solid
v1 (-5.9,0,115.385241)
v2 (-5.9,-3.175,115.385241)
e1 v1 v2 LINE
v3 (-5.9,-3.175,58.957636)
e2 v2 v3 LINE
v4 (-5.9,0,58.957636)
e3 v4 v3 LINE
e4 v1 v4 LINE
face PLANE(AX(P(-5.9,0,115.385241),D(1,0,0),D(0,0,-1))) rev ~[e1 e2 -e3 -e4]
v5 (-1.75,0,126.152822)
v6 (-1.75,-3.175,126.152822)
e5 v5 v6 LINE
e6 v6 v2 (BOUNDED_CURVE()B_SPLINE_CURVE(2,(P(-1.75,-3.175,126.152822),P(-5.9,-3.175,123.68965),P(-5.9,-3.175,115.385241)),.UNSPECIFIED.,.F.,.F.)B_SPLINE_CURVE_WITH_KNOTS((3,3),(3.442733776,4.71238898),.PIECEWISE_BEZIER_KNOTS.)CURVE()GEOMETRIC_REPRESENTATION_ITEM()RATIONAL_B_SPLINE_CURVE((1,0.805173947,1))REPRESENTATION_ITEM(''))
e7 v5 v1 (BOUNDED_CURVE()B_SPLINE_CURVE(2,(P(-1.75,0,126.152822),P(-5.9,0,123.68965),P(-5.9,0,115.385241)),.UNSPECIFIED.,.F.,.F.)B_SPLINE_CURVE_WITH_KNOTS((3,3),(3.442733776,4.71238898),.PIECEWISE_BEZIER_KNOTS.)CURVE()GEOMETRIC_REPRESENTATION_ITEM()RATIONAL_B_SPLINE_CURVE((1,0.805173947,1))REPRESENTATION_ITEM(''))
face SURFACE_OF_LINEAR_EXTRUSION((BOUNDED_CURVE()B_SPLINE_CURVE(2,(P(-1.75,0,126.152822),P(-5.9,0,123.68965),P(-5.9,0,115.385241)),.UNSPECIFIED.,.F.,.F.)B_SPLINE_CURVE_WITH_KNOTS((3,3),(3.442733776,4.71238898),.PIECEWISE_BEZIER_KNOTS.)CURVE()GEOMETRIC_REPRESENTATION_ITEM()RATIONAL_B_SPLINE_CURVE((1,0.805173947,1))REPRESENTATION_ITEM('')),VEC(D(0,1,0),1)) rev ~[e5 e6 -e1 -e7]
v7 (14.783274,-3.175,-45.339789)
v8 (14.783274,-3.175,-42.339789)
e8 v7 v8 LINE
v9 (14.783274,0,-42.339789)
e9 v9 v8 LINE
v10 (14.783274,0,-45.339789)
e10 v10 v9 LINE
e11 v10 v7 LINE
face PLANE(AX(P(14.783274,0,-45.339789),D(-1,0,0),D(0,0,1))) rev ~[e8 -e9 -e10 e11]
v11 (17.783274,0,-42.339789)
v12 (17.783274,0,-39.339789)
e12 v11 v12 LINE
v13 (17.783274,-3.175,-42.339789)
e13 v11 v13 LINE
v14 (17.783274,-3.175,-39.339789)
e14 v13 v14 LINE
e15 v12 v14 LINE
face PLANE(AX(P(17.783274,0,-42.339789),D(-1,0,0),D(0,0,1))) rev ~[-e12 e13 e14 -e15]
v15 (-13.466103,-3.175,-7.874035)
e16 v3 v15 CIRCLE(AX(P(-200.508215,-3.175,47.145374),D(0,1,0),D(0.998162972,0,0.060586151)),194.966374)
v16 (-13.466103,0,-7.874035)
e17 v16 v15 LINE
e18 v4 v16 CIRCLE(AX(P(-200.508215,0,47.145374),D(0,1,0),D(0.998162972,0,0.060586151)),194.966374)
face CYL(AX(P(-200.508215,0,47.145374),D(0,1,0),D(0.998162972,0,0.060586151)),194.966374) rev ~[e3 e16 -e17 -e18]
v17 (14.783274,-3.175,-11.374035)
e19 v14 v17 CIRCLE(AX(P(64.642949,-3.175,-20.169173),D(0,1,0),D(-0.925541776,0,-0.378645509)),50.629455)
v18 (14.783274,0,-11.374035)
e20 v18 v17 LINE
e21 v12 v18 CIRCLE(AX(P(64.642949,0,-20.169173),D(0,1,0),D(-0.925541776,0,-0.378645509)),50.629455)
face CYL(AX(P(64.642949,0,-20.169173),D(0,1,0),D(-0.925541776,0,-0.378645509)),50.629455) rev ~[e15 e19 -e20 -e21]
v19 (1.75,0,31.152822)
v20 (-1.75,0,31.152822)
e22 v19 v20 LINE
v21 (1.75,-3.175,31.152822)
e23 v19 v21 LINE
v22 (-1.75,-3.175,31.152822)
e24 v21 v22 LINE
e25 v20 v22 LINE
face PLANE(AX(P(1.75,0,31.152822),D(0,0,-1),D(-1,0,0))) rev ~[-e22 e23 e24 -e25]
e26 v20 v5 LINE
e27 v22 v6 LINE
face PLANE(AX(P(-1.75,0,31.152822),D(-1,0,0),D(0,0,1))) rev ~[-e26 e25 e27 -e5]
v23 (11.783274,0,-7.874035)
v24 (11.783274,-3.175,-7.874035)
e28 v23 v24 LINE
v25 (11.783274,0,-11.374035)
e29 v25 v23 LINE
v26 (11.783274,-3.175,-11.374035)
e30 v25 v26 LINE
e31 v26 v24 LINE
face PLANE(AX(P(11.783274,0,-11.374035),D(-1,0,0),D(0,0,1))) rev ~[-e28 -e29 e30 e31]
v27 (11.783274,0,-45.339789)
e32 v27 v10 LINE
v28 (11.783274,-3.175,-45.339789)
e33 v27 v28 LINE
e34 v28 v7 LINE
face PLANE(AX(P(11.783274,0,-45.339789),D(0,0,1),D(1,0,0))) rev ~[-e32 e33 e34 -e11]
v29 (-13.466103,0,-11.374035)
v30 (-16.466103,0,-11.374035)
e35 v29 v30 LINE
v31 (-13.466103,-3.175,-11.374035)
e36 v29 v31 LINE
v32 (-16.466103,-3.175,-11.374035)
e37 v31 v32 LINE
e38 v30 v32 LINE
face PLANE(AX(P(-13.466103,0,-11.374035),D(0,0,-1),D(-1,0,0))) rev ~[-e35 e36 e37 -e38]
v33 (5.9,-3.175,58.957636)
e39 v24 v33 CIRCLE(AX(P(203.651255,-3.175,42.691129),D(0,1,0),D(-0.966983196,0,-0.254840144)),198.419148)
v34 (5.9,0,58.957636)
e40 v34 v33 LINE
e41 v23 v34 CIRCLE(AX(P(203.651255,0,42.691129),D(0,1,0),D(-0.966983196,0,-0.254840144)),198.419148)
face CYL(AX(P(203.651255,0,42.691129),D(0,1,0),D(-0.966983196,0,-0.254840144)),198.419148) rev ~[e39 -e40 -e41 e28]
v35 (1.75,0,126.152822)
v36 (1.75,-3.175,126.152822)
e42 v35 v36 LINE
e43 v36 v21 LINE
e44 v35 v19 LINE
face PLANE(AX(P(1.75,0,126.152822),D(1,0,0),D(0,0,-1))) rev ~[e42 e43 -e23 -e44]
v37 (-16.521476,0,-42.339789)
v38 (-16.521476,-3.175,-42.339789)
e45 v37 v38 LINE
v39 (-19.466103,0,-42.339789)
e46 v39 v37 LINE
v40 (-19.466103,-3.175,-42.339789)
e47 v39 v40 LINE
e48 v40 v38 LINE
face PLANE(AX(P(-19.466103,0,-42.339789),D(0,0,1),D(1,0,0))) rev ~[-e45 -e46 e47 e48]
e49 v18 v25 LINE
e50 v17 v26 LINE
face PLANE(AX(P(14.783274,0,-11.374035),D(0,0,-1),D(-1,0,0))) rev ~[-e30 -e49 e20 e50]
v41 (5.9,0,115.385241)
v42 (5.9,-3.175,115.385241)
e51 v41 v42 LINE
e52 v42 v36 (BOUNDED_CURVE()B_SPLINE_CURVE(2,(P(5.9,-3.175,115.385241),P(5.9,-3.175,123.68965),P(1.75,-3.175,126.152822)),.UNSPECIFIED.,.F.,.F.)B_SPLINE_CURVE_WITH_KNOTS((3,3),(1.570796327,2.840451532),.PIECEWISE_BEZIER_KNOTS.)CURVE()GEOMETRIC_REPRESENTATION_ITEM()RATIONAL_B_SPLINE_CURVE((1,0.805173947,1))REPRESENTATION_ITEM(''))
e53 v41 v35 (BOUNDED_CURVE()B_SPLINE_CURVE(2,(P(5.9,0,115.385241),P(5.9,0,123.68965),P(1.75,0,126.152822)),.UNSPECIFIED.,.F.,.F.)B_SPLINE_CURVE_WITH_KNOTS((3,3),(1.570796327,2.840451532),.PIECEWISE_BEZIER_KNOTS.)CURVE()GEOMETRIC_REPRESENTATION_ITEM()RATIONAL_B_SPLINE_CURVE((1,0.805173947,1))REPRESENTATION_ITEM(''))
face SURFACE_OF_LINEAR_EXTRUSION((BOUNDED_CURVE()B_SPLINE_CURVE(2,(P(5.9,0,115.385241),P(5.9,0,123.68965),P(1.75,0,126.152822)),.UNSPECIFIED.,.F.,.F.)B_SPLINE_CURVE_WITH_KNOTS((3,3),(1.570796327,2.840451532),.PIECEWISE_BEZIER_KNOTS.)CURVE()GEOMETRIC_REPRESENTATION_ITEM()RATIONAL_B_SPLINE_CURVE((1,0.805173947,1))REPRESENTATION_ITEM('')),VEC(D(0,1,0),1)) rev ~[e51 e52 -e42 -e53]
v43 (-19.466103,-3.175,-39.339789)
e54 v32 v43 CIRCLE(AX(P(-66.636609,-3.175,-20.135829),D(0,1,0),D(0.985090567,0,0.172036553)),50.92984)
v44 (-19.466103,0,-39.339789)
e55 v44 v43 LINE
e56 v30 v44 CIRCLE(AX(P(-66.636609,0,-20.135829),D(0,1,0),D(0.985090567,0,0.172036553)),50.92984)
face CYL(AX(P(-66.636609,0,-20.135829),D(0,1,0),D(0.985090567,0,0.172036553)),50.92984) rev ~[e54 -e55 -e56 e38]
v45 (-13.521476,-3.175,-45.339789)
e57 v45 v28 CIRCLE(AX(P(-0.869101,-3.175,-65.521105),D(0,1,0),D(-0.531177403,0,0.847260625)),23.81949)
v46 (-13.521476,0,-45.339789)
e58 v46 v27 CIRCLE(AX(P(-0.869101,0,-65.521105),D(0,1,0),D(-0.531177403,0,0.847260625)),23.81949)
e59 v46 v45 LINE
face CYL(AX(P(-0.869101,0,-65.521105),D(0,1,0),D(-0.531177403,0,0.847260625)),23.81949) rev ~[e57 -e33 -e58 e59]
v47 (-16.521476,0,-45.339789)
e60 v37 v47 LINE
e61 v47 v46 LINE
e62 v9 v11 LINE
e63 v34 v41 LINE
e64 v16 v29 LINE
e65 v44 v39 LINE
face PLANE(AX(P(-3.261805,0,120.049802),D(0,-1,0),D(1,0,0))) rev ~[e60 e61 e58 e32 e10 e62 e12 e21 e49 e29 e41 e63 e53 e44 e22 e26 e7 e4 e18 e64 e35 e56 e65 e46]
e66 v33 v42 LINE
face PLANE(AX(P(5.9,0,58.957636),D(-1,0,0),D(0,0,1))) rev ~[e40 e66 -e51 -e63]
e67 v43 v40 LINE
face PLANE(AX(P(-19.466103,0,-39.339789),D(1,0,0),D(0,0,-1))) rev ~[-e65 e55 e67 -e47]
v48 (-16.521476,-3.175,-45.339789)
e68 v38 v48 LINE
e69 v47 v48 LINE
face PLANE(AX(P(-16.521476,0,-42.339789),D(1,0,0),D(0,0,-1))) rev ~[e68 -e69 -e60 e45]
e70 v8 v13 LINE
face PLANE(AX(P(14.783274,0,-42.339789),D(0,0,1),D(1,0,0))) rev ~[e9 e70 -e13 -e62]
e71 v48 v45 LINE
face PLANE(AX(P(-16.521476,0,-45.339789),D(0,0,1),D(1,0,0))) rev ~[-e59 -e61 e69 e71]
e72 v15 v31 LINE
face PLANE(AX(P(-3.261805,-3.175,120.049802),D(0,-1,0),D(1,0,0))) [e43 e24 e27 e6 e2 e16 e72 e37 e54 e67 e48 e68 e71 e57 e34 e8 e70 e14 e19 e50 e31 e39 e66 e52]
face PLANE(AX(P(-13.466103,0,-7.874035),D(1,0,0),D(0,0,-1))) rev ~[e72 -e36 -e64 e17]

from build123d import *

# Parameters (mm, degrees)
F1_DEPTH = 3.175


# Not quite as in the source:
# - a length typed as a fraction of an inch, garbled in the dataset ("3 / 203.2 mm" for 3/8 in), is restored


with BuildPart() as f1:
    # F0 (on Front) → F1 (new body)
    with BuildSketch(Plane.XZ):
        with BuildLine():
            add(Edge.make_bspline(
                [(-1.75, 126.1528220874), (-5.9, 123.6896499738), (-5.9, 115.3852411336)],
                knots=[3.4427337756, 3.4427337756, 3.4427337756, 4.7123889804, 4.7123889804, 4.7123889804], degree=2, weights=[1, 0.8051739469, 1]))
            Line((-5.9, 115.3852411336), (-1.75, 115.3852411336))
            Line((-1.75, 115.3852411336), (-1.75, 126.1528220874))
        make_face()
        with BuildLine():
            add(Edge.make_bspline(
                [(-5.9, 115.3852411336), (-5.9, 107.0808322935), (-1.75, 104.6176601799)],
                knots=[4.7123889804, 4.7123889804, 4.7123889804, 5.9820441852, 5.9820441852, 5.9820441852], degree=2, weights=[1, 0.8051739469, 1]))
            Line((-5.9, 115.3852411336), (-5.9, 79.8345449512))
            Line((-5.9, 79.8345449512), (-5.9, 58.9576361328))
            ThreePointArc((-5.9, 58.9576361328), (-6.7793812573, 25.2130721087), (-13.4661033603, -7.8740350493))
            Line((-13.4661033603, -7.8740350493), (11.7832735849, -7.8740350493))
            ThreePointArc((11.7832735849, -7.8740350493), (5.9964918029, 25.2913389557), (5.9, 58.9576361328))
            Line((5.9, 58.9576361328), (5.9, 79.8345449512))
            Line((5.9, 79.8345449512), (5.9, 115.3852411336))
            add(Edge.make_bspline(
                [(1.75, 104.6176601799), (5.9, 107.0808322935), (5.9, 115.3852411336)],
                knots=[0.301141122, 0.301141122, 0.301141122, 1.5707963268, 1.5707963268, 1.5707963268], degree=2, weights=[1, 0.8051739469, 1]))
            Line((1.75, 104.6176601799), (1.75, 31.1528220874))
            Line((1.75, 31.1528220874), (-1.75, 31.1528220874))
            Line((-1.75, 31.1528220874), (-1.75, 104.6176601799))
        make_face()
        with BuildLine():
            Line((-1.75, 115.3852411336), (-5.9, 115.3852411336))
            add(Edge.make_bspline(
                [(-5.9, 115.3852411336), (-5.9, 107.0808322935), (-1.75, 104.6176601799)],
                knots=[4.7123889804, 4.7123889804, 4.7123889804, 5.9820441852, 5.9820441852, 5.9820441852], degree=2, weights=[1, 0.8051739469, 1]))
            Line((-1.75, 104.6176601799), (-1.75, 115.3852411336))
        make_face()
        with BuildLine():
            Line((1.75, 126.1528220874), (1.75, 115.3852411336))
            Line((1.75, 115.3852411336), (5.9, 115.3852411336))
            add(Edge.make_bspline(
                [(5.9, 115.3852411336), (5.9, 123.6896499738), (1.75, 126.1528220874)],
                knots=[1.5707963268, 1.5707963268, 1.5707963268, 2.8404515316, 2.8404515316, 2.8404515316], degree=2, weights=[1, 0.8051739469, 1]))
        make_face()
        with BuildLine():
            Line((5.9, 115.3852411336), (1.75, 115.3852411336))
            Line((1.75, 115.3852411336), (1.75, 104.6176601799))
            add(Edge.make_bspline(
                [(1.75, 104.6176601799), (5.9, 107.0808322935), (5.9, 115.3852411336)],
                knots=[0.301141122, 0.301141122, 0.301141122, 1.5707963268, 1.5707963268, 1.5707963268], degree=2, weights=[1, 0.8051739469, 1]))
        make_face()
        with BuildLine():
            Line((11.7832735849, -7.8740350493), (-13.4661033603, -7.8740350493))
            Line((-13.4661033603, -7.8740350493), (-13.4661033603, -11.3740350493))
            Line((-13.4661033603, -11.3740350493), (-16.4661033603, -11.3740350493))
            ThreePointArc((-16.4661033603, -11.3740350493), (-15.9973063906, -25.5681128526), (-19.4661033603, -39.3397889622))
            Line((-19.4661033603, -39.3397889622), (-19.4661033603, -42.3397889622))
            Line((-19.4661033603, -42.3397889622), (-16.5214760231, -42.3397889622))
            Line((-16.5214760231, -42.3397889622), (-16.5214760231, -45.3397889622))
            Line((-16.5214760231, -45.3397889622), (-13.5214760231, -45.3397889622))
            ThreePointArc((-13.5214760231, -45.3397889622), (-0.8691012191, -41.7016149524), (11.7832735849, -45.3397889622))
            Line((11.7832735849, -45.3397889622), (14.7832735849, -45.3397889622))
            Line((14.7832735849, -45.3397889622), (14.7832735849, -42.3397889622))
            Line((14.7832735849, -42.3397889622), (17.7832735849, -42.3397889622))
            Line((17.7832735849, -42.3397889622), (17.7832735849, -39.3397889622))
            ThreePointArc((17.7832735849, -39.3397889622), (14.302318759, -25.5694170752), (14.7832735849, -11.3740350493))
            Line((14.7832735849, -11.3740350493), (11.7832735849, -11.3740350493))
            Line((11.7832735849, -11.3740350493), (11.7832735849, -7.8740350493))
        make_face()
    extrude(amount=F1_DEPTH)


solid = f1.part
